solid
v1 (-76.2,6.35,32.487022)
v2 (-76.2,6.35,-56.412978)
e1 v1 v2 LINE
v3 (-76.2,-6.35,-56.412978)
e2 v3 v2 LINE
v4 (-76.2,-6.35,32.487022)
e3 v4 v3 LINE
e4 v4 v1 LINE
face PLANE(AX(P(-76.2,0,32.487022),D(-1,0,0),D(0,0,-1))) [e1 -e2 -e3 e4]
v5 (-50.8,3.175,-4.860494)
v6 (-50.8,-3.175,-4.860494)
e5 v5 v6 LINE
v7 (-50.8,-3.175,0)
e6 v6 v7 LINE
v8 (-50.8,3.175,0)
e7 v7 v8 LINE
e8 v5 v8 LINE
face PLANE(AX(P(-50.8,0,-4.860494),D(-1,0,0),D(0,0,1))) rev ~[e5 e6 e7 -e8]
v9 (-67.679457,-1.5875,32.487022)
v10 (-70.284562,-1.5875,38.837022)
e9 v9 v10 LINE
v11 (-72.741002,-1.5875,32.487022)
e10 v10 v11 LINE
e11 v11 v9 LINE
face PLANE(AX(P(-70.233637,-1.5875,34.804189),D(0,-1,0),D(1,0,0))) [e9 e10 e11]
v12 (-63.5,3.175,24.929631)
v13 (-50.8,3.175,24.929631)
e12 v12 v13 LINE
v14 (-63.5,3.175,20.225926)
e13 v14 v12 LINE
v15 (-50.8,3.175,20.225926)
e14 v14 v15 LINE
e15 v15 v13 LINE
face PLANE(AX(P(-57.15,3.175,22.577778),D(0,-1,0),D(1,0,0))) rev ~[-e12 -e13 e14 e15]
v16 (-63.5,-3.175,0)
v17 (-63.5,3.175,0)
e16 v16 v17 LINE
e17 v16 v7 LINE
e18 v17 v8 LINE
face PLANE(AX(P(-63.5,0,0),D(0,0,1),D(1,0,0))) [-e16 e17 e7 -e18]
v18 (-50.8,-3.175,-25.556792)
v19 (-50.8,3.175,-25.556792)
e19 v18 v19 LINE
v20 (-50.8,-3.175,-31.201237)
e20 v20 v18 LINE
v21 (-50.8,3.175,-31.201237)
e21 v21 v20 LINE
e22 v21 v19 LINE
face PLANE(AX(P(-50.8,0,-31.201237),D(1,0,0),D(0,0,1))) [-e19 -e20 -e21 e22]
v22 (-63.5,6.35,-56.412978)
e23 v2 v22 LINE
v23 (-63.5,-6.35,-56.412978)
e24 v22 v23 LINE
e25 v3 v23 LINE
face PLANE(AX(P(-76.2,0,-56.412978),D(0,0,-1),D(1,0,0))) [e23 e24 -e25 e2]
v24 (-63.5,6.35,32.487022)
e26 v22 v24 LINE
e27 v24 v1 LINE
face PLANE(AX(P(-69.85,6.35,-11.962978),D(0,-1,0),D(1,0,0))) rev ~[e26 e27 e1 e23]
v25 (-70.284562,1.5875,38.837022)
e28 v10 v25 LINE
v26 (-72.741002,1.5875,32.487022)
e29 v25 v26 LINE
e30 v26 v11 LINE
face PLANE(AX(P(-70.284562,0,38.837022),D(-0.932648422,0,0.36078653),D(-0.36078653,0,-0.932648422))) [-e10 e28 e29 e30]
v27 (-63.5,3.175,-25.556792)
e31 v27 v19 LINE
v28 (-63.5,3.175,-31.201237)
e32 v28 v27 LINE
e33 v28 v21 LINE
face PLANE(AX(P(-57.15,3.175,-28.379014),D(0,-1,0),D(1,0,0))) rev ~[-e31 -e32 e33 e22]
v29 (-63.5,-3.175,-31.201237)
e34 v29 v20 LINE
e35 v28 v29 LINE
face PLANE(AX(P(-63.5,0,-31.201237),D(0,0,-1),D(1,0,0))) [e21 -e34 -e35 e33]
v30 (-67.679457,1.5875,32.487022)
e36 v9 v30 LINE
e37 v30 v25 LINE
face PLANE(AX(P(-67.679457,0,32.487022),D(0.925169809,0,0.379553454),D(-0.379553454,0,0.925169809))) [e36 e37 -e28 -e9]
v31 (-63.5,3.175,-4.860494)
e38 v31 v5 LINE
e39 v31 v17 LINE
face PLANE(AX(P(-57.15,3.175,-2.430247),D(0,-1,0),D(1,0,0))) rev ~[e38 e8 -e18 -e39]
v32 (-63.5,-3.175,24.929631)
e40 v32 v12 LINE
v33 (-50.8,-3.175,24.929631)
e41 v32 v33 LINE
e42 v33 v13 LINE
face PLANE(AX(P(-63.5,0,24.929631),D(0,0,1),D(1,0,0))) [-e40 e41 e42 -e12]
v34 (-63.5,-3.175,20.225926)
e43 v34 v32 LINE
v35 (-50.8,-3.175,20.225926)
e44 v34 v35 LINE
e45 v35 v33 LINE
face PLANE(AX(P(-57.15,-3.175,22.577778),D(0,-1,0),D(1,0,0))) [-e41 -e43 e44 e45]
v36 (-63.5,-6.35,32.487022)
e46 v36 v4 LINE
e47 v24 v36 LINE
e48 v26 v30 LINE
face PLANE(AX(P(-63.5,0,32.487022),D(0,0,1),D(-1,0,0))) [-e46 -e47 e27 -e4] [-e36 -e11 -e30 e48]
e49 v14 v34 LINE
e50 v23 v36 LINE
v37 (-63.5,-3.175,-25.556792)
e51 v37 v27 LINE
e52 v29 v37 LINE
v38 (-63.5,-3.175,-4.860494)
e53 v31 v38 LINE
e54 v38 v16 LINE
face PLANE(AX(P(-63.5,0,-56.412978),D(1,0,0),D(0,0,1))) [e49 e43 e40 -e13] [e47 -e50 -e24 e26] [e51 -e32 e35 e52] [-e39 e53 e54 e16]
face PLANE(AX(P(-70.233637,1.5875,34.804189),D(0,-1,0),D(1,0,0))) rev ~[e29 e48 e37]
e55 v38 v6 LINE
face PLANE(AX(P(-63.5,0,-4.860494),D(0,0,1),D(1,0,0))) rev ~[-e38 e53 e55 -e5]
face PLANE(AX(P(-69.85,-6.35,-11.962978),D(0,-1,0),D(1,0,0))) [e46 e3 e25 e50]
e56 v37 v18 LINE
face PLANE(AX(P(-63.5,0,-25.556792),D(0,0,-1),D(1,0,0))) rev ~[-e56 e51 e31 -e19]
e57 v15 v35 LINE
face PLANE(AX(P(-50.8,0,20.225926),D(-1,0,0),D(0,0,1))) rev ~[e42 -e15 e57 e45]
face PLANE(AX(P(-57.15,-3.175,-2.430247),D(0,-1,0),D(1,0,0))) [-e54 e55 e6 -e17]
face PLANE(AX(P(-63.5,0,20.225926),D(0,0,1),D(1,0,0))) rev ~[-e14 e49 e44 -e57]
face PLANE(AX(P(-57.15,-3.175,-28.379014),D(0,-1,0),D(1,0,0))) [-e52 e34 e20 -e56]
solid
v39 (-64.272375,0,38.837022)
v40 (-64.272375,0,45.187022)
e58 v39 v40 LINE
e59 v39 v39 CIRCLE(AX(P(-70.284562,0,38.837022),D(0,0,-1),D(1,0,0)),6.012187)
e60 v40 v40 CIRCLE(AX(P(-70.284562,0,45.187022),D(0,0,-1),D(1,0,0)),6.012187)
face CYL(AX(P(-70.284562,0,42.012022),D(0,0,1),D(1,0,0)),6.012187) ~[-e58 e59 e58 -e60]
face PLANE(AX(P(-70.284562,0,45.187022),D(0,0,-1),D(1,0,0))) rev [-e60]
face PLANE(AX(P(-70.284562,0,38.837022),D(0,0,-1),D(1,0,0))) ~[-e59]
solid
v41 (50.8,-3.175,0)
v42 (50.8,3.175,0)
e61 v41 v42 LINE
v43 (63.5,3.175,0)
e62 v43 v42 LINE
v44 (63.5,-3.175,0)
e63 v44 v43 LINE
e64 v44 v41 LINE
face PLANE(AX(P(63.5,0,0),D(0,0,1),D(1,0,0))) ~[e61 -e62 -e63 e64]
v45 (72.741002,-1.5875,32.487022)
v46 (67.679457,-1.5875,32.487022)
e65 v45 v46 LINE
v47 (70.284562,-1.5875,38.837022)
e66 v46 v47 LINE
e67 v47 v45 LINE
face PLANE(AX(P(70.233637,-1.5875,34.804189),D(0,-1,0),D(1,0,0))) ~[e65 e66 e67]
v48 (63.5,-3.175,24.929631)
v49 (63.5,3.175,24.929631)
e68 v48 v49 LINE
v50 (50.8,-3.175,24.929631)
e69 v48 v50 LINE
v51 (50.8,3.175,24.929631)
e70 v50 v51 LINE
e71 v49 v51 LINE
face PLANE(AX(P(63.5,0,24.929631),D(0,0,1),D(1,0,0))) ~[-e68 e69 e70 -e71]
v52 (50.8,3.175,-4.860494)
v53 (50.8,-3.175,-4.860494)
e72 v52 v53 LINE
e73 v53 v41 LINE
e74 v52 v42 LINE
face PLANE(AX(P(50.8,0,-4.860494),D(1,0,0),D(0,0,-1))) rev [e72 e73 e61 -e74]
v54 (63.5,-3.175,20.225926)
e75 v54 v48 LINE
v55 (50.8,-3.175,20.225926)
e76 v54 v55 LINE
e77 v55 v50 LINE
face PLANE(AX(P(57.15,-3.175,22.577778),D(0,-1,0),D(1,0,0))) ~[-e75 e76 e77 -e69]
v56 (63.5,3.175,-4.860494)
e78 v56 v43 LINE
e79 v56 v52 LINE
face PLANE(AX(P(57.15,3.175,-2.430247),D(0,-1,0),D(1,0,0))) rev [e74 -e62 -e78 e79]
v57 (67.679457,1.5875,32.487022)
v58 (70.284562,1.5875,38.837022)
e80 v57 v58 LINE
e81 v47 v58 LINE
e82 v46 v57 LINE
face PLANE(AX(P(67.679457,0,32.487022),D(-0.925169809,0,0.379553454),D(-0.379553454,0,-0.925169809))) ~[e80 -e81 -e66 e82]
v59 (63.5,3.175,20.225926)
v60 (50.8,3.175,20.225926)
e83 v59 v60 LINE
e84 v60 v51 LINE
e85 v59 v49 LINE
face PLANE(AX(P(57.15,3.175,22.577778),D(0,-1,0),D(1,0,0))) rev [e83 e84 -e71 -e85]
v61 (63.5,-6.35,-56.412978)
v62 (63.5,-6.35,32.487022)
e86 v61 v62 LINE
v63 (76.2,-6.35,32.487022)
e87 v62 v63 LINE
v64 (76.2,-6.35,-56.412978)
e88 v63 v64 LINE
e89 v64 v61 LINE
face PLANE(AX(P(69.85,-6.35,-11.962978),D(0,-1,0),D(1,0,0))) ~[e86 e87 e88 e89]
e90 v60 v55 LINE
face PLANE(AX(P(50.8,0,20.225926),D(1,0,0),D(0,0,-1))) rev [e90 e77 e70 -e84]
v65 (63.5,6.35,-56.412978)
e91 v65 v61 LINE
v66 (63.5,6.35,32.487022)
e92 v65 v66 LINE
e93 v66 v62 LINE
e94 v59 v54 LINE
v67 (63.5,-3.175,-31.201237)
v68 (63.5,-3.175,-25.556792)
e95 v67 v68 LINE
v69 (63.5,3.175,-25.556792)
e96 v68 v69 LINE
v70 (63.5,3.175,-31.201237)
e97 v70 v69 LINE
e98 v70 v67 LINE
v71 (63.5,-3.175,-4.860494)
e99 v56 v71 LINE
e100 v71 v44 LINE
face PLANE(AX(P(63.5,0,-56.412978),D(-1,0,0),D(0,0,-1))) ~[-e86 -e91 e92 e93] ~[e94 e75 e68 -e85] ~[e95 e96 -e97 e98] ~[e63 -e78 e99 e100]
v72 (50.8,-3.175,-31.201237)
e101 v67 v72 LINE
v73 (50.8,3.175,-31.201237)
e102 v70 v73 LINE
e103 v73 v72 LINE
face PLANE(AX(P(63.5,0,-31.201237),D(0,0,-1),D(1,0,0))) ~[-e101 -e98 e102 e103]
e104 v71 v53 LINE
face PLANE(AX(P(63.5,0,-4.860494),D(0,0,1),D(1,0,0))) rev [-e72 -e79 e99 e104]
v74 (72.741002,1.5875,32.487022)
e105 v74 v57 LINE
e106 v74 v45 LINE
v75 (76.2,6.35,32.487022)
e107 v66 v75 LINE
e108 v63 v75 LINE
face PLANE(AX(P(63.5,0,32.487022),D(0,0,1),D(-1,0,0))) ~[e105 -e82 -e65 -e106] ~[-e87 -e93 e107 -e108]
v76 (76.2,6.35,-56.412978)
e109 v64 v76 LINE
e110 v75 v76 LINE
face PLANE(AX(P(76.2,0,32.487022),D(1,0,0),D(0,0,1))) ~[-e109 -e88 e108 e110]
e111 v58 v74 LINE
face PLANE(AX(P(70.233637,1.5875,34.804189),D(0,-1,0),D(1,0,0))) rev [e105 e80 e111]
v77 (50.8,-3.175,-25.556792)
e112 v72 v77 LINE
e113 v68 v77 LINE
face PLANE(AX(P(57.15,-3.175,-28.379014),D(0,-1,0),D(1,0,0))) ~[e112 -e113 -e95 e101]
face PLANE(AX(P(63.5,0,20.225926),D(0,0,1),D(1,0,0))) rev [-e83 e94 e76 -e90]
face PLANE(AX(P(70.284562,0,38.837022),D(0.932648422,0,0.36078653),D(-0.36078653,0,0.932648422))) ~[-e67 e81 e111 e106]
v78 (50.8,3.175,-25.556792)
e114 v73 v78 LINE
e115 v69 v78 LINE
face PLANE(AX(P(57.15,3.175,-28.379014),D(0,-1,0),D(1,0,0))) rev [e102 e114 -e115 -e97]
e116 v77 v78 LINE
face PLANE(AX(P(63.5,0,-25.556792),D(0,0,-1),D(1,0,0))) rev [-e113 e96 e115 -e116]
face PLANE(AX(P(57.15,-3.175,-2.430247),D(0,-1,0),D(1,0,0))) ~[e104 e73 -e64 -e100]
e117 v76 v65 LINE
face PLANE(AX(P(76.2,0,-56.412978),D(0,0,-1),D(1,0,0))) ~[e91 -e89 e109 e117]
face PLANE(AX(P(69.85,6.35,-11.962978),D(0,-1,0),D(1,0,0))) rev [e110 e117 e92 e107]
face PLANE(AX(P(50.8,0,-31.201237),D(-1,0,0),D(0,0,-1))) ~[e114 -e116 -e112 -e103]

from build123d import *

# Parameters (mm, degrees)
F1_DEPTH = 6.35
F0_W     = 12.7
F0_H     = 4.7037045424
F0_H_2   = 4.8604938446
F0_H_3   = 5.6444450735
F2_DEPTH = 3.175
F0_W_2   = 6.0121872838
F0_H_4   = 6.35
F4_DEPTH = 1.5875


with BuildPart() as f1:
    # F0 (on Front) → F1 (new body, symmetric)
    with BuildSketch(Plane.XZ):
        Polygon((-76.2, -56.4129777904), (-63.5, -56.4129777904), (-63.5, -31.2012367346), (-63.5, -25.5567916611), (-63.5, -4.8604938446), (-63.5, 0), (-63.5, 20.2259261356), (-63.5, 24.929630678), (-63.5, 32.4870222096), (-67.6794573665, 32.4870222096), (-72.7410018444, 32.4870222096), (-76.2, 32.4870222096), align=None)
    extrude(amount=F1_DEPTH, both=True)

    # F0 (on Front) → F2 (join, symmetric)
    with BuildSketch(Plane.XZ):
        with Locations((-57.15, 22.5777784068)):
            Rectangle(F0_W, F0_H)
        with Locations((-57.15, -2.4302469223)):
            Rectangle(F0_W, F0_H_2)
        with Locations((-57.15, -28.3790141978)):
            Rectangle(F0_W, F0_H_3)
    extrude(amount=F2_DEPTH, both=True)

    # F0 (on Front) → F4 (join, symmetric)
    with BuildSketch(Plane.XZ):
        Polygon((-70.2845623006, 38.8370222096), (-72.7410018444, 32.4870222096), (-67.6794573665, 32.4870222096), align=None)
    extrude(amount=F4_DEPTH, both=True)


with BuildPart() as f3:
    # F0 (on Front) → F3 (revolve)
    with BuildSketch(Plane.XZ):
        with Locations((-67.2784686587, 42.0120222096)):
            Rectangle(F0_W_2, F0_H_4)
    revolve(axis=Axis((-70.2845623006, 0, 42.0120222096), (0, 0, -1)))


with BuildPart() as f5_1:
    # F5: instance of F1
    add(f1.part.mirror(Plane.YZ))


solid = Compound([f1.part, f3.part, f5_1.part])
